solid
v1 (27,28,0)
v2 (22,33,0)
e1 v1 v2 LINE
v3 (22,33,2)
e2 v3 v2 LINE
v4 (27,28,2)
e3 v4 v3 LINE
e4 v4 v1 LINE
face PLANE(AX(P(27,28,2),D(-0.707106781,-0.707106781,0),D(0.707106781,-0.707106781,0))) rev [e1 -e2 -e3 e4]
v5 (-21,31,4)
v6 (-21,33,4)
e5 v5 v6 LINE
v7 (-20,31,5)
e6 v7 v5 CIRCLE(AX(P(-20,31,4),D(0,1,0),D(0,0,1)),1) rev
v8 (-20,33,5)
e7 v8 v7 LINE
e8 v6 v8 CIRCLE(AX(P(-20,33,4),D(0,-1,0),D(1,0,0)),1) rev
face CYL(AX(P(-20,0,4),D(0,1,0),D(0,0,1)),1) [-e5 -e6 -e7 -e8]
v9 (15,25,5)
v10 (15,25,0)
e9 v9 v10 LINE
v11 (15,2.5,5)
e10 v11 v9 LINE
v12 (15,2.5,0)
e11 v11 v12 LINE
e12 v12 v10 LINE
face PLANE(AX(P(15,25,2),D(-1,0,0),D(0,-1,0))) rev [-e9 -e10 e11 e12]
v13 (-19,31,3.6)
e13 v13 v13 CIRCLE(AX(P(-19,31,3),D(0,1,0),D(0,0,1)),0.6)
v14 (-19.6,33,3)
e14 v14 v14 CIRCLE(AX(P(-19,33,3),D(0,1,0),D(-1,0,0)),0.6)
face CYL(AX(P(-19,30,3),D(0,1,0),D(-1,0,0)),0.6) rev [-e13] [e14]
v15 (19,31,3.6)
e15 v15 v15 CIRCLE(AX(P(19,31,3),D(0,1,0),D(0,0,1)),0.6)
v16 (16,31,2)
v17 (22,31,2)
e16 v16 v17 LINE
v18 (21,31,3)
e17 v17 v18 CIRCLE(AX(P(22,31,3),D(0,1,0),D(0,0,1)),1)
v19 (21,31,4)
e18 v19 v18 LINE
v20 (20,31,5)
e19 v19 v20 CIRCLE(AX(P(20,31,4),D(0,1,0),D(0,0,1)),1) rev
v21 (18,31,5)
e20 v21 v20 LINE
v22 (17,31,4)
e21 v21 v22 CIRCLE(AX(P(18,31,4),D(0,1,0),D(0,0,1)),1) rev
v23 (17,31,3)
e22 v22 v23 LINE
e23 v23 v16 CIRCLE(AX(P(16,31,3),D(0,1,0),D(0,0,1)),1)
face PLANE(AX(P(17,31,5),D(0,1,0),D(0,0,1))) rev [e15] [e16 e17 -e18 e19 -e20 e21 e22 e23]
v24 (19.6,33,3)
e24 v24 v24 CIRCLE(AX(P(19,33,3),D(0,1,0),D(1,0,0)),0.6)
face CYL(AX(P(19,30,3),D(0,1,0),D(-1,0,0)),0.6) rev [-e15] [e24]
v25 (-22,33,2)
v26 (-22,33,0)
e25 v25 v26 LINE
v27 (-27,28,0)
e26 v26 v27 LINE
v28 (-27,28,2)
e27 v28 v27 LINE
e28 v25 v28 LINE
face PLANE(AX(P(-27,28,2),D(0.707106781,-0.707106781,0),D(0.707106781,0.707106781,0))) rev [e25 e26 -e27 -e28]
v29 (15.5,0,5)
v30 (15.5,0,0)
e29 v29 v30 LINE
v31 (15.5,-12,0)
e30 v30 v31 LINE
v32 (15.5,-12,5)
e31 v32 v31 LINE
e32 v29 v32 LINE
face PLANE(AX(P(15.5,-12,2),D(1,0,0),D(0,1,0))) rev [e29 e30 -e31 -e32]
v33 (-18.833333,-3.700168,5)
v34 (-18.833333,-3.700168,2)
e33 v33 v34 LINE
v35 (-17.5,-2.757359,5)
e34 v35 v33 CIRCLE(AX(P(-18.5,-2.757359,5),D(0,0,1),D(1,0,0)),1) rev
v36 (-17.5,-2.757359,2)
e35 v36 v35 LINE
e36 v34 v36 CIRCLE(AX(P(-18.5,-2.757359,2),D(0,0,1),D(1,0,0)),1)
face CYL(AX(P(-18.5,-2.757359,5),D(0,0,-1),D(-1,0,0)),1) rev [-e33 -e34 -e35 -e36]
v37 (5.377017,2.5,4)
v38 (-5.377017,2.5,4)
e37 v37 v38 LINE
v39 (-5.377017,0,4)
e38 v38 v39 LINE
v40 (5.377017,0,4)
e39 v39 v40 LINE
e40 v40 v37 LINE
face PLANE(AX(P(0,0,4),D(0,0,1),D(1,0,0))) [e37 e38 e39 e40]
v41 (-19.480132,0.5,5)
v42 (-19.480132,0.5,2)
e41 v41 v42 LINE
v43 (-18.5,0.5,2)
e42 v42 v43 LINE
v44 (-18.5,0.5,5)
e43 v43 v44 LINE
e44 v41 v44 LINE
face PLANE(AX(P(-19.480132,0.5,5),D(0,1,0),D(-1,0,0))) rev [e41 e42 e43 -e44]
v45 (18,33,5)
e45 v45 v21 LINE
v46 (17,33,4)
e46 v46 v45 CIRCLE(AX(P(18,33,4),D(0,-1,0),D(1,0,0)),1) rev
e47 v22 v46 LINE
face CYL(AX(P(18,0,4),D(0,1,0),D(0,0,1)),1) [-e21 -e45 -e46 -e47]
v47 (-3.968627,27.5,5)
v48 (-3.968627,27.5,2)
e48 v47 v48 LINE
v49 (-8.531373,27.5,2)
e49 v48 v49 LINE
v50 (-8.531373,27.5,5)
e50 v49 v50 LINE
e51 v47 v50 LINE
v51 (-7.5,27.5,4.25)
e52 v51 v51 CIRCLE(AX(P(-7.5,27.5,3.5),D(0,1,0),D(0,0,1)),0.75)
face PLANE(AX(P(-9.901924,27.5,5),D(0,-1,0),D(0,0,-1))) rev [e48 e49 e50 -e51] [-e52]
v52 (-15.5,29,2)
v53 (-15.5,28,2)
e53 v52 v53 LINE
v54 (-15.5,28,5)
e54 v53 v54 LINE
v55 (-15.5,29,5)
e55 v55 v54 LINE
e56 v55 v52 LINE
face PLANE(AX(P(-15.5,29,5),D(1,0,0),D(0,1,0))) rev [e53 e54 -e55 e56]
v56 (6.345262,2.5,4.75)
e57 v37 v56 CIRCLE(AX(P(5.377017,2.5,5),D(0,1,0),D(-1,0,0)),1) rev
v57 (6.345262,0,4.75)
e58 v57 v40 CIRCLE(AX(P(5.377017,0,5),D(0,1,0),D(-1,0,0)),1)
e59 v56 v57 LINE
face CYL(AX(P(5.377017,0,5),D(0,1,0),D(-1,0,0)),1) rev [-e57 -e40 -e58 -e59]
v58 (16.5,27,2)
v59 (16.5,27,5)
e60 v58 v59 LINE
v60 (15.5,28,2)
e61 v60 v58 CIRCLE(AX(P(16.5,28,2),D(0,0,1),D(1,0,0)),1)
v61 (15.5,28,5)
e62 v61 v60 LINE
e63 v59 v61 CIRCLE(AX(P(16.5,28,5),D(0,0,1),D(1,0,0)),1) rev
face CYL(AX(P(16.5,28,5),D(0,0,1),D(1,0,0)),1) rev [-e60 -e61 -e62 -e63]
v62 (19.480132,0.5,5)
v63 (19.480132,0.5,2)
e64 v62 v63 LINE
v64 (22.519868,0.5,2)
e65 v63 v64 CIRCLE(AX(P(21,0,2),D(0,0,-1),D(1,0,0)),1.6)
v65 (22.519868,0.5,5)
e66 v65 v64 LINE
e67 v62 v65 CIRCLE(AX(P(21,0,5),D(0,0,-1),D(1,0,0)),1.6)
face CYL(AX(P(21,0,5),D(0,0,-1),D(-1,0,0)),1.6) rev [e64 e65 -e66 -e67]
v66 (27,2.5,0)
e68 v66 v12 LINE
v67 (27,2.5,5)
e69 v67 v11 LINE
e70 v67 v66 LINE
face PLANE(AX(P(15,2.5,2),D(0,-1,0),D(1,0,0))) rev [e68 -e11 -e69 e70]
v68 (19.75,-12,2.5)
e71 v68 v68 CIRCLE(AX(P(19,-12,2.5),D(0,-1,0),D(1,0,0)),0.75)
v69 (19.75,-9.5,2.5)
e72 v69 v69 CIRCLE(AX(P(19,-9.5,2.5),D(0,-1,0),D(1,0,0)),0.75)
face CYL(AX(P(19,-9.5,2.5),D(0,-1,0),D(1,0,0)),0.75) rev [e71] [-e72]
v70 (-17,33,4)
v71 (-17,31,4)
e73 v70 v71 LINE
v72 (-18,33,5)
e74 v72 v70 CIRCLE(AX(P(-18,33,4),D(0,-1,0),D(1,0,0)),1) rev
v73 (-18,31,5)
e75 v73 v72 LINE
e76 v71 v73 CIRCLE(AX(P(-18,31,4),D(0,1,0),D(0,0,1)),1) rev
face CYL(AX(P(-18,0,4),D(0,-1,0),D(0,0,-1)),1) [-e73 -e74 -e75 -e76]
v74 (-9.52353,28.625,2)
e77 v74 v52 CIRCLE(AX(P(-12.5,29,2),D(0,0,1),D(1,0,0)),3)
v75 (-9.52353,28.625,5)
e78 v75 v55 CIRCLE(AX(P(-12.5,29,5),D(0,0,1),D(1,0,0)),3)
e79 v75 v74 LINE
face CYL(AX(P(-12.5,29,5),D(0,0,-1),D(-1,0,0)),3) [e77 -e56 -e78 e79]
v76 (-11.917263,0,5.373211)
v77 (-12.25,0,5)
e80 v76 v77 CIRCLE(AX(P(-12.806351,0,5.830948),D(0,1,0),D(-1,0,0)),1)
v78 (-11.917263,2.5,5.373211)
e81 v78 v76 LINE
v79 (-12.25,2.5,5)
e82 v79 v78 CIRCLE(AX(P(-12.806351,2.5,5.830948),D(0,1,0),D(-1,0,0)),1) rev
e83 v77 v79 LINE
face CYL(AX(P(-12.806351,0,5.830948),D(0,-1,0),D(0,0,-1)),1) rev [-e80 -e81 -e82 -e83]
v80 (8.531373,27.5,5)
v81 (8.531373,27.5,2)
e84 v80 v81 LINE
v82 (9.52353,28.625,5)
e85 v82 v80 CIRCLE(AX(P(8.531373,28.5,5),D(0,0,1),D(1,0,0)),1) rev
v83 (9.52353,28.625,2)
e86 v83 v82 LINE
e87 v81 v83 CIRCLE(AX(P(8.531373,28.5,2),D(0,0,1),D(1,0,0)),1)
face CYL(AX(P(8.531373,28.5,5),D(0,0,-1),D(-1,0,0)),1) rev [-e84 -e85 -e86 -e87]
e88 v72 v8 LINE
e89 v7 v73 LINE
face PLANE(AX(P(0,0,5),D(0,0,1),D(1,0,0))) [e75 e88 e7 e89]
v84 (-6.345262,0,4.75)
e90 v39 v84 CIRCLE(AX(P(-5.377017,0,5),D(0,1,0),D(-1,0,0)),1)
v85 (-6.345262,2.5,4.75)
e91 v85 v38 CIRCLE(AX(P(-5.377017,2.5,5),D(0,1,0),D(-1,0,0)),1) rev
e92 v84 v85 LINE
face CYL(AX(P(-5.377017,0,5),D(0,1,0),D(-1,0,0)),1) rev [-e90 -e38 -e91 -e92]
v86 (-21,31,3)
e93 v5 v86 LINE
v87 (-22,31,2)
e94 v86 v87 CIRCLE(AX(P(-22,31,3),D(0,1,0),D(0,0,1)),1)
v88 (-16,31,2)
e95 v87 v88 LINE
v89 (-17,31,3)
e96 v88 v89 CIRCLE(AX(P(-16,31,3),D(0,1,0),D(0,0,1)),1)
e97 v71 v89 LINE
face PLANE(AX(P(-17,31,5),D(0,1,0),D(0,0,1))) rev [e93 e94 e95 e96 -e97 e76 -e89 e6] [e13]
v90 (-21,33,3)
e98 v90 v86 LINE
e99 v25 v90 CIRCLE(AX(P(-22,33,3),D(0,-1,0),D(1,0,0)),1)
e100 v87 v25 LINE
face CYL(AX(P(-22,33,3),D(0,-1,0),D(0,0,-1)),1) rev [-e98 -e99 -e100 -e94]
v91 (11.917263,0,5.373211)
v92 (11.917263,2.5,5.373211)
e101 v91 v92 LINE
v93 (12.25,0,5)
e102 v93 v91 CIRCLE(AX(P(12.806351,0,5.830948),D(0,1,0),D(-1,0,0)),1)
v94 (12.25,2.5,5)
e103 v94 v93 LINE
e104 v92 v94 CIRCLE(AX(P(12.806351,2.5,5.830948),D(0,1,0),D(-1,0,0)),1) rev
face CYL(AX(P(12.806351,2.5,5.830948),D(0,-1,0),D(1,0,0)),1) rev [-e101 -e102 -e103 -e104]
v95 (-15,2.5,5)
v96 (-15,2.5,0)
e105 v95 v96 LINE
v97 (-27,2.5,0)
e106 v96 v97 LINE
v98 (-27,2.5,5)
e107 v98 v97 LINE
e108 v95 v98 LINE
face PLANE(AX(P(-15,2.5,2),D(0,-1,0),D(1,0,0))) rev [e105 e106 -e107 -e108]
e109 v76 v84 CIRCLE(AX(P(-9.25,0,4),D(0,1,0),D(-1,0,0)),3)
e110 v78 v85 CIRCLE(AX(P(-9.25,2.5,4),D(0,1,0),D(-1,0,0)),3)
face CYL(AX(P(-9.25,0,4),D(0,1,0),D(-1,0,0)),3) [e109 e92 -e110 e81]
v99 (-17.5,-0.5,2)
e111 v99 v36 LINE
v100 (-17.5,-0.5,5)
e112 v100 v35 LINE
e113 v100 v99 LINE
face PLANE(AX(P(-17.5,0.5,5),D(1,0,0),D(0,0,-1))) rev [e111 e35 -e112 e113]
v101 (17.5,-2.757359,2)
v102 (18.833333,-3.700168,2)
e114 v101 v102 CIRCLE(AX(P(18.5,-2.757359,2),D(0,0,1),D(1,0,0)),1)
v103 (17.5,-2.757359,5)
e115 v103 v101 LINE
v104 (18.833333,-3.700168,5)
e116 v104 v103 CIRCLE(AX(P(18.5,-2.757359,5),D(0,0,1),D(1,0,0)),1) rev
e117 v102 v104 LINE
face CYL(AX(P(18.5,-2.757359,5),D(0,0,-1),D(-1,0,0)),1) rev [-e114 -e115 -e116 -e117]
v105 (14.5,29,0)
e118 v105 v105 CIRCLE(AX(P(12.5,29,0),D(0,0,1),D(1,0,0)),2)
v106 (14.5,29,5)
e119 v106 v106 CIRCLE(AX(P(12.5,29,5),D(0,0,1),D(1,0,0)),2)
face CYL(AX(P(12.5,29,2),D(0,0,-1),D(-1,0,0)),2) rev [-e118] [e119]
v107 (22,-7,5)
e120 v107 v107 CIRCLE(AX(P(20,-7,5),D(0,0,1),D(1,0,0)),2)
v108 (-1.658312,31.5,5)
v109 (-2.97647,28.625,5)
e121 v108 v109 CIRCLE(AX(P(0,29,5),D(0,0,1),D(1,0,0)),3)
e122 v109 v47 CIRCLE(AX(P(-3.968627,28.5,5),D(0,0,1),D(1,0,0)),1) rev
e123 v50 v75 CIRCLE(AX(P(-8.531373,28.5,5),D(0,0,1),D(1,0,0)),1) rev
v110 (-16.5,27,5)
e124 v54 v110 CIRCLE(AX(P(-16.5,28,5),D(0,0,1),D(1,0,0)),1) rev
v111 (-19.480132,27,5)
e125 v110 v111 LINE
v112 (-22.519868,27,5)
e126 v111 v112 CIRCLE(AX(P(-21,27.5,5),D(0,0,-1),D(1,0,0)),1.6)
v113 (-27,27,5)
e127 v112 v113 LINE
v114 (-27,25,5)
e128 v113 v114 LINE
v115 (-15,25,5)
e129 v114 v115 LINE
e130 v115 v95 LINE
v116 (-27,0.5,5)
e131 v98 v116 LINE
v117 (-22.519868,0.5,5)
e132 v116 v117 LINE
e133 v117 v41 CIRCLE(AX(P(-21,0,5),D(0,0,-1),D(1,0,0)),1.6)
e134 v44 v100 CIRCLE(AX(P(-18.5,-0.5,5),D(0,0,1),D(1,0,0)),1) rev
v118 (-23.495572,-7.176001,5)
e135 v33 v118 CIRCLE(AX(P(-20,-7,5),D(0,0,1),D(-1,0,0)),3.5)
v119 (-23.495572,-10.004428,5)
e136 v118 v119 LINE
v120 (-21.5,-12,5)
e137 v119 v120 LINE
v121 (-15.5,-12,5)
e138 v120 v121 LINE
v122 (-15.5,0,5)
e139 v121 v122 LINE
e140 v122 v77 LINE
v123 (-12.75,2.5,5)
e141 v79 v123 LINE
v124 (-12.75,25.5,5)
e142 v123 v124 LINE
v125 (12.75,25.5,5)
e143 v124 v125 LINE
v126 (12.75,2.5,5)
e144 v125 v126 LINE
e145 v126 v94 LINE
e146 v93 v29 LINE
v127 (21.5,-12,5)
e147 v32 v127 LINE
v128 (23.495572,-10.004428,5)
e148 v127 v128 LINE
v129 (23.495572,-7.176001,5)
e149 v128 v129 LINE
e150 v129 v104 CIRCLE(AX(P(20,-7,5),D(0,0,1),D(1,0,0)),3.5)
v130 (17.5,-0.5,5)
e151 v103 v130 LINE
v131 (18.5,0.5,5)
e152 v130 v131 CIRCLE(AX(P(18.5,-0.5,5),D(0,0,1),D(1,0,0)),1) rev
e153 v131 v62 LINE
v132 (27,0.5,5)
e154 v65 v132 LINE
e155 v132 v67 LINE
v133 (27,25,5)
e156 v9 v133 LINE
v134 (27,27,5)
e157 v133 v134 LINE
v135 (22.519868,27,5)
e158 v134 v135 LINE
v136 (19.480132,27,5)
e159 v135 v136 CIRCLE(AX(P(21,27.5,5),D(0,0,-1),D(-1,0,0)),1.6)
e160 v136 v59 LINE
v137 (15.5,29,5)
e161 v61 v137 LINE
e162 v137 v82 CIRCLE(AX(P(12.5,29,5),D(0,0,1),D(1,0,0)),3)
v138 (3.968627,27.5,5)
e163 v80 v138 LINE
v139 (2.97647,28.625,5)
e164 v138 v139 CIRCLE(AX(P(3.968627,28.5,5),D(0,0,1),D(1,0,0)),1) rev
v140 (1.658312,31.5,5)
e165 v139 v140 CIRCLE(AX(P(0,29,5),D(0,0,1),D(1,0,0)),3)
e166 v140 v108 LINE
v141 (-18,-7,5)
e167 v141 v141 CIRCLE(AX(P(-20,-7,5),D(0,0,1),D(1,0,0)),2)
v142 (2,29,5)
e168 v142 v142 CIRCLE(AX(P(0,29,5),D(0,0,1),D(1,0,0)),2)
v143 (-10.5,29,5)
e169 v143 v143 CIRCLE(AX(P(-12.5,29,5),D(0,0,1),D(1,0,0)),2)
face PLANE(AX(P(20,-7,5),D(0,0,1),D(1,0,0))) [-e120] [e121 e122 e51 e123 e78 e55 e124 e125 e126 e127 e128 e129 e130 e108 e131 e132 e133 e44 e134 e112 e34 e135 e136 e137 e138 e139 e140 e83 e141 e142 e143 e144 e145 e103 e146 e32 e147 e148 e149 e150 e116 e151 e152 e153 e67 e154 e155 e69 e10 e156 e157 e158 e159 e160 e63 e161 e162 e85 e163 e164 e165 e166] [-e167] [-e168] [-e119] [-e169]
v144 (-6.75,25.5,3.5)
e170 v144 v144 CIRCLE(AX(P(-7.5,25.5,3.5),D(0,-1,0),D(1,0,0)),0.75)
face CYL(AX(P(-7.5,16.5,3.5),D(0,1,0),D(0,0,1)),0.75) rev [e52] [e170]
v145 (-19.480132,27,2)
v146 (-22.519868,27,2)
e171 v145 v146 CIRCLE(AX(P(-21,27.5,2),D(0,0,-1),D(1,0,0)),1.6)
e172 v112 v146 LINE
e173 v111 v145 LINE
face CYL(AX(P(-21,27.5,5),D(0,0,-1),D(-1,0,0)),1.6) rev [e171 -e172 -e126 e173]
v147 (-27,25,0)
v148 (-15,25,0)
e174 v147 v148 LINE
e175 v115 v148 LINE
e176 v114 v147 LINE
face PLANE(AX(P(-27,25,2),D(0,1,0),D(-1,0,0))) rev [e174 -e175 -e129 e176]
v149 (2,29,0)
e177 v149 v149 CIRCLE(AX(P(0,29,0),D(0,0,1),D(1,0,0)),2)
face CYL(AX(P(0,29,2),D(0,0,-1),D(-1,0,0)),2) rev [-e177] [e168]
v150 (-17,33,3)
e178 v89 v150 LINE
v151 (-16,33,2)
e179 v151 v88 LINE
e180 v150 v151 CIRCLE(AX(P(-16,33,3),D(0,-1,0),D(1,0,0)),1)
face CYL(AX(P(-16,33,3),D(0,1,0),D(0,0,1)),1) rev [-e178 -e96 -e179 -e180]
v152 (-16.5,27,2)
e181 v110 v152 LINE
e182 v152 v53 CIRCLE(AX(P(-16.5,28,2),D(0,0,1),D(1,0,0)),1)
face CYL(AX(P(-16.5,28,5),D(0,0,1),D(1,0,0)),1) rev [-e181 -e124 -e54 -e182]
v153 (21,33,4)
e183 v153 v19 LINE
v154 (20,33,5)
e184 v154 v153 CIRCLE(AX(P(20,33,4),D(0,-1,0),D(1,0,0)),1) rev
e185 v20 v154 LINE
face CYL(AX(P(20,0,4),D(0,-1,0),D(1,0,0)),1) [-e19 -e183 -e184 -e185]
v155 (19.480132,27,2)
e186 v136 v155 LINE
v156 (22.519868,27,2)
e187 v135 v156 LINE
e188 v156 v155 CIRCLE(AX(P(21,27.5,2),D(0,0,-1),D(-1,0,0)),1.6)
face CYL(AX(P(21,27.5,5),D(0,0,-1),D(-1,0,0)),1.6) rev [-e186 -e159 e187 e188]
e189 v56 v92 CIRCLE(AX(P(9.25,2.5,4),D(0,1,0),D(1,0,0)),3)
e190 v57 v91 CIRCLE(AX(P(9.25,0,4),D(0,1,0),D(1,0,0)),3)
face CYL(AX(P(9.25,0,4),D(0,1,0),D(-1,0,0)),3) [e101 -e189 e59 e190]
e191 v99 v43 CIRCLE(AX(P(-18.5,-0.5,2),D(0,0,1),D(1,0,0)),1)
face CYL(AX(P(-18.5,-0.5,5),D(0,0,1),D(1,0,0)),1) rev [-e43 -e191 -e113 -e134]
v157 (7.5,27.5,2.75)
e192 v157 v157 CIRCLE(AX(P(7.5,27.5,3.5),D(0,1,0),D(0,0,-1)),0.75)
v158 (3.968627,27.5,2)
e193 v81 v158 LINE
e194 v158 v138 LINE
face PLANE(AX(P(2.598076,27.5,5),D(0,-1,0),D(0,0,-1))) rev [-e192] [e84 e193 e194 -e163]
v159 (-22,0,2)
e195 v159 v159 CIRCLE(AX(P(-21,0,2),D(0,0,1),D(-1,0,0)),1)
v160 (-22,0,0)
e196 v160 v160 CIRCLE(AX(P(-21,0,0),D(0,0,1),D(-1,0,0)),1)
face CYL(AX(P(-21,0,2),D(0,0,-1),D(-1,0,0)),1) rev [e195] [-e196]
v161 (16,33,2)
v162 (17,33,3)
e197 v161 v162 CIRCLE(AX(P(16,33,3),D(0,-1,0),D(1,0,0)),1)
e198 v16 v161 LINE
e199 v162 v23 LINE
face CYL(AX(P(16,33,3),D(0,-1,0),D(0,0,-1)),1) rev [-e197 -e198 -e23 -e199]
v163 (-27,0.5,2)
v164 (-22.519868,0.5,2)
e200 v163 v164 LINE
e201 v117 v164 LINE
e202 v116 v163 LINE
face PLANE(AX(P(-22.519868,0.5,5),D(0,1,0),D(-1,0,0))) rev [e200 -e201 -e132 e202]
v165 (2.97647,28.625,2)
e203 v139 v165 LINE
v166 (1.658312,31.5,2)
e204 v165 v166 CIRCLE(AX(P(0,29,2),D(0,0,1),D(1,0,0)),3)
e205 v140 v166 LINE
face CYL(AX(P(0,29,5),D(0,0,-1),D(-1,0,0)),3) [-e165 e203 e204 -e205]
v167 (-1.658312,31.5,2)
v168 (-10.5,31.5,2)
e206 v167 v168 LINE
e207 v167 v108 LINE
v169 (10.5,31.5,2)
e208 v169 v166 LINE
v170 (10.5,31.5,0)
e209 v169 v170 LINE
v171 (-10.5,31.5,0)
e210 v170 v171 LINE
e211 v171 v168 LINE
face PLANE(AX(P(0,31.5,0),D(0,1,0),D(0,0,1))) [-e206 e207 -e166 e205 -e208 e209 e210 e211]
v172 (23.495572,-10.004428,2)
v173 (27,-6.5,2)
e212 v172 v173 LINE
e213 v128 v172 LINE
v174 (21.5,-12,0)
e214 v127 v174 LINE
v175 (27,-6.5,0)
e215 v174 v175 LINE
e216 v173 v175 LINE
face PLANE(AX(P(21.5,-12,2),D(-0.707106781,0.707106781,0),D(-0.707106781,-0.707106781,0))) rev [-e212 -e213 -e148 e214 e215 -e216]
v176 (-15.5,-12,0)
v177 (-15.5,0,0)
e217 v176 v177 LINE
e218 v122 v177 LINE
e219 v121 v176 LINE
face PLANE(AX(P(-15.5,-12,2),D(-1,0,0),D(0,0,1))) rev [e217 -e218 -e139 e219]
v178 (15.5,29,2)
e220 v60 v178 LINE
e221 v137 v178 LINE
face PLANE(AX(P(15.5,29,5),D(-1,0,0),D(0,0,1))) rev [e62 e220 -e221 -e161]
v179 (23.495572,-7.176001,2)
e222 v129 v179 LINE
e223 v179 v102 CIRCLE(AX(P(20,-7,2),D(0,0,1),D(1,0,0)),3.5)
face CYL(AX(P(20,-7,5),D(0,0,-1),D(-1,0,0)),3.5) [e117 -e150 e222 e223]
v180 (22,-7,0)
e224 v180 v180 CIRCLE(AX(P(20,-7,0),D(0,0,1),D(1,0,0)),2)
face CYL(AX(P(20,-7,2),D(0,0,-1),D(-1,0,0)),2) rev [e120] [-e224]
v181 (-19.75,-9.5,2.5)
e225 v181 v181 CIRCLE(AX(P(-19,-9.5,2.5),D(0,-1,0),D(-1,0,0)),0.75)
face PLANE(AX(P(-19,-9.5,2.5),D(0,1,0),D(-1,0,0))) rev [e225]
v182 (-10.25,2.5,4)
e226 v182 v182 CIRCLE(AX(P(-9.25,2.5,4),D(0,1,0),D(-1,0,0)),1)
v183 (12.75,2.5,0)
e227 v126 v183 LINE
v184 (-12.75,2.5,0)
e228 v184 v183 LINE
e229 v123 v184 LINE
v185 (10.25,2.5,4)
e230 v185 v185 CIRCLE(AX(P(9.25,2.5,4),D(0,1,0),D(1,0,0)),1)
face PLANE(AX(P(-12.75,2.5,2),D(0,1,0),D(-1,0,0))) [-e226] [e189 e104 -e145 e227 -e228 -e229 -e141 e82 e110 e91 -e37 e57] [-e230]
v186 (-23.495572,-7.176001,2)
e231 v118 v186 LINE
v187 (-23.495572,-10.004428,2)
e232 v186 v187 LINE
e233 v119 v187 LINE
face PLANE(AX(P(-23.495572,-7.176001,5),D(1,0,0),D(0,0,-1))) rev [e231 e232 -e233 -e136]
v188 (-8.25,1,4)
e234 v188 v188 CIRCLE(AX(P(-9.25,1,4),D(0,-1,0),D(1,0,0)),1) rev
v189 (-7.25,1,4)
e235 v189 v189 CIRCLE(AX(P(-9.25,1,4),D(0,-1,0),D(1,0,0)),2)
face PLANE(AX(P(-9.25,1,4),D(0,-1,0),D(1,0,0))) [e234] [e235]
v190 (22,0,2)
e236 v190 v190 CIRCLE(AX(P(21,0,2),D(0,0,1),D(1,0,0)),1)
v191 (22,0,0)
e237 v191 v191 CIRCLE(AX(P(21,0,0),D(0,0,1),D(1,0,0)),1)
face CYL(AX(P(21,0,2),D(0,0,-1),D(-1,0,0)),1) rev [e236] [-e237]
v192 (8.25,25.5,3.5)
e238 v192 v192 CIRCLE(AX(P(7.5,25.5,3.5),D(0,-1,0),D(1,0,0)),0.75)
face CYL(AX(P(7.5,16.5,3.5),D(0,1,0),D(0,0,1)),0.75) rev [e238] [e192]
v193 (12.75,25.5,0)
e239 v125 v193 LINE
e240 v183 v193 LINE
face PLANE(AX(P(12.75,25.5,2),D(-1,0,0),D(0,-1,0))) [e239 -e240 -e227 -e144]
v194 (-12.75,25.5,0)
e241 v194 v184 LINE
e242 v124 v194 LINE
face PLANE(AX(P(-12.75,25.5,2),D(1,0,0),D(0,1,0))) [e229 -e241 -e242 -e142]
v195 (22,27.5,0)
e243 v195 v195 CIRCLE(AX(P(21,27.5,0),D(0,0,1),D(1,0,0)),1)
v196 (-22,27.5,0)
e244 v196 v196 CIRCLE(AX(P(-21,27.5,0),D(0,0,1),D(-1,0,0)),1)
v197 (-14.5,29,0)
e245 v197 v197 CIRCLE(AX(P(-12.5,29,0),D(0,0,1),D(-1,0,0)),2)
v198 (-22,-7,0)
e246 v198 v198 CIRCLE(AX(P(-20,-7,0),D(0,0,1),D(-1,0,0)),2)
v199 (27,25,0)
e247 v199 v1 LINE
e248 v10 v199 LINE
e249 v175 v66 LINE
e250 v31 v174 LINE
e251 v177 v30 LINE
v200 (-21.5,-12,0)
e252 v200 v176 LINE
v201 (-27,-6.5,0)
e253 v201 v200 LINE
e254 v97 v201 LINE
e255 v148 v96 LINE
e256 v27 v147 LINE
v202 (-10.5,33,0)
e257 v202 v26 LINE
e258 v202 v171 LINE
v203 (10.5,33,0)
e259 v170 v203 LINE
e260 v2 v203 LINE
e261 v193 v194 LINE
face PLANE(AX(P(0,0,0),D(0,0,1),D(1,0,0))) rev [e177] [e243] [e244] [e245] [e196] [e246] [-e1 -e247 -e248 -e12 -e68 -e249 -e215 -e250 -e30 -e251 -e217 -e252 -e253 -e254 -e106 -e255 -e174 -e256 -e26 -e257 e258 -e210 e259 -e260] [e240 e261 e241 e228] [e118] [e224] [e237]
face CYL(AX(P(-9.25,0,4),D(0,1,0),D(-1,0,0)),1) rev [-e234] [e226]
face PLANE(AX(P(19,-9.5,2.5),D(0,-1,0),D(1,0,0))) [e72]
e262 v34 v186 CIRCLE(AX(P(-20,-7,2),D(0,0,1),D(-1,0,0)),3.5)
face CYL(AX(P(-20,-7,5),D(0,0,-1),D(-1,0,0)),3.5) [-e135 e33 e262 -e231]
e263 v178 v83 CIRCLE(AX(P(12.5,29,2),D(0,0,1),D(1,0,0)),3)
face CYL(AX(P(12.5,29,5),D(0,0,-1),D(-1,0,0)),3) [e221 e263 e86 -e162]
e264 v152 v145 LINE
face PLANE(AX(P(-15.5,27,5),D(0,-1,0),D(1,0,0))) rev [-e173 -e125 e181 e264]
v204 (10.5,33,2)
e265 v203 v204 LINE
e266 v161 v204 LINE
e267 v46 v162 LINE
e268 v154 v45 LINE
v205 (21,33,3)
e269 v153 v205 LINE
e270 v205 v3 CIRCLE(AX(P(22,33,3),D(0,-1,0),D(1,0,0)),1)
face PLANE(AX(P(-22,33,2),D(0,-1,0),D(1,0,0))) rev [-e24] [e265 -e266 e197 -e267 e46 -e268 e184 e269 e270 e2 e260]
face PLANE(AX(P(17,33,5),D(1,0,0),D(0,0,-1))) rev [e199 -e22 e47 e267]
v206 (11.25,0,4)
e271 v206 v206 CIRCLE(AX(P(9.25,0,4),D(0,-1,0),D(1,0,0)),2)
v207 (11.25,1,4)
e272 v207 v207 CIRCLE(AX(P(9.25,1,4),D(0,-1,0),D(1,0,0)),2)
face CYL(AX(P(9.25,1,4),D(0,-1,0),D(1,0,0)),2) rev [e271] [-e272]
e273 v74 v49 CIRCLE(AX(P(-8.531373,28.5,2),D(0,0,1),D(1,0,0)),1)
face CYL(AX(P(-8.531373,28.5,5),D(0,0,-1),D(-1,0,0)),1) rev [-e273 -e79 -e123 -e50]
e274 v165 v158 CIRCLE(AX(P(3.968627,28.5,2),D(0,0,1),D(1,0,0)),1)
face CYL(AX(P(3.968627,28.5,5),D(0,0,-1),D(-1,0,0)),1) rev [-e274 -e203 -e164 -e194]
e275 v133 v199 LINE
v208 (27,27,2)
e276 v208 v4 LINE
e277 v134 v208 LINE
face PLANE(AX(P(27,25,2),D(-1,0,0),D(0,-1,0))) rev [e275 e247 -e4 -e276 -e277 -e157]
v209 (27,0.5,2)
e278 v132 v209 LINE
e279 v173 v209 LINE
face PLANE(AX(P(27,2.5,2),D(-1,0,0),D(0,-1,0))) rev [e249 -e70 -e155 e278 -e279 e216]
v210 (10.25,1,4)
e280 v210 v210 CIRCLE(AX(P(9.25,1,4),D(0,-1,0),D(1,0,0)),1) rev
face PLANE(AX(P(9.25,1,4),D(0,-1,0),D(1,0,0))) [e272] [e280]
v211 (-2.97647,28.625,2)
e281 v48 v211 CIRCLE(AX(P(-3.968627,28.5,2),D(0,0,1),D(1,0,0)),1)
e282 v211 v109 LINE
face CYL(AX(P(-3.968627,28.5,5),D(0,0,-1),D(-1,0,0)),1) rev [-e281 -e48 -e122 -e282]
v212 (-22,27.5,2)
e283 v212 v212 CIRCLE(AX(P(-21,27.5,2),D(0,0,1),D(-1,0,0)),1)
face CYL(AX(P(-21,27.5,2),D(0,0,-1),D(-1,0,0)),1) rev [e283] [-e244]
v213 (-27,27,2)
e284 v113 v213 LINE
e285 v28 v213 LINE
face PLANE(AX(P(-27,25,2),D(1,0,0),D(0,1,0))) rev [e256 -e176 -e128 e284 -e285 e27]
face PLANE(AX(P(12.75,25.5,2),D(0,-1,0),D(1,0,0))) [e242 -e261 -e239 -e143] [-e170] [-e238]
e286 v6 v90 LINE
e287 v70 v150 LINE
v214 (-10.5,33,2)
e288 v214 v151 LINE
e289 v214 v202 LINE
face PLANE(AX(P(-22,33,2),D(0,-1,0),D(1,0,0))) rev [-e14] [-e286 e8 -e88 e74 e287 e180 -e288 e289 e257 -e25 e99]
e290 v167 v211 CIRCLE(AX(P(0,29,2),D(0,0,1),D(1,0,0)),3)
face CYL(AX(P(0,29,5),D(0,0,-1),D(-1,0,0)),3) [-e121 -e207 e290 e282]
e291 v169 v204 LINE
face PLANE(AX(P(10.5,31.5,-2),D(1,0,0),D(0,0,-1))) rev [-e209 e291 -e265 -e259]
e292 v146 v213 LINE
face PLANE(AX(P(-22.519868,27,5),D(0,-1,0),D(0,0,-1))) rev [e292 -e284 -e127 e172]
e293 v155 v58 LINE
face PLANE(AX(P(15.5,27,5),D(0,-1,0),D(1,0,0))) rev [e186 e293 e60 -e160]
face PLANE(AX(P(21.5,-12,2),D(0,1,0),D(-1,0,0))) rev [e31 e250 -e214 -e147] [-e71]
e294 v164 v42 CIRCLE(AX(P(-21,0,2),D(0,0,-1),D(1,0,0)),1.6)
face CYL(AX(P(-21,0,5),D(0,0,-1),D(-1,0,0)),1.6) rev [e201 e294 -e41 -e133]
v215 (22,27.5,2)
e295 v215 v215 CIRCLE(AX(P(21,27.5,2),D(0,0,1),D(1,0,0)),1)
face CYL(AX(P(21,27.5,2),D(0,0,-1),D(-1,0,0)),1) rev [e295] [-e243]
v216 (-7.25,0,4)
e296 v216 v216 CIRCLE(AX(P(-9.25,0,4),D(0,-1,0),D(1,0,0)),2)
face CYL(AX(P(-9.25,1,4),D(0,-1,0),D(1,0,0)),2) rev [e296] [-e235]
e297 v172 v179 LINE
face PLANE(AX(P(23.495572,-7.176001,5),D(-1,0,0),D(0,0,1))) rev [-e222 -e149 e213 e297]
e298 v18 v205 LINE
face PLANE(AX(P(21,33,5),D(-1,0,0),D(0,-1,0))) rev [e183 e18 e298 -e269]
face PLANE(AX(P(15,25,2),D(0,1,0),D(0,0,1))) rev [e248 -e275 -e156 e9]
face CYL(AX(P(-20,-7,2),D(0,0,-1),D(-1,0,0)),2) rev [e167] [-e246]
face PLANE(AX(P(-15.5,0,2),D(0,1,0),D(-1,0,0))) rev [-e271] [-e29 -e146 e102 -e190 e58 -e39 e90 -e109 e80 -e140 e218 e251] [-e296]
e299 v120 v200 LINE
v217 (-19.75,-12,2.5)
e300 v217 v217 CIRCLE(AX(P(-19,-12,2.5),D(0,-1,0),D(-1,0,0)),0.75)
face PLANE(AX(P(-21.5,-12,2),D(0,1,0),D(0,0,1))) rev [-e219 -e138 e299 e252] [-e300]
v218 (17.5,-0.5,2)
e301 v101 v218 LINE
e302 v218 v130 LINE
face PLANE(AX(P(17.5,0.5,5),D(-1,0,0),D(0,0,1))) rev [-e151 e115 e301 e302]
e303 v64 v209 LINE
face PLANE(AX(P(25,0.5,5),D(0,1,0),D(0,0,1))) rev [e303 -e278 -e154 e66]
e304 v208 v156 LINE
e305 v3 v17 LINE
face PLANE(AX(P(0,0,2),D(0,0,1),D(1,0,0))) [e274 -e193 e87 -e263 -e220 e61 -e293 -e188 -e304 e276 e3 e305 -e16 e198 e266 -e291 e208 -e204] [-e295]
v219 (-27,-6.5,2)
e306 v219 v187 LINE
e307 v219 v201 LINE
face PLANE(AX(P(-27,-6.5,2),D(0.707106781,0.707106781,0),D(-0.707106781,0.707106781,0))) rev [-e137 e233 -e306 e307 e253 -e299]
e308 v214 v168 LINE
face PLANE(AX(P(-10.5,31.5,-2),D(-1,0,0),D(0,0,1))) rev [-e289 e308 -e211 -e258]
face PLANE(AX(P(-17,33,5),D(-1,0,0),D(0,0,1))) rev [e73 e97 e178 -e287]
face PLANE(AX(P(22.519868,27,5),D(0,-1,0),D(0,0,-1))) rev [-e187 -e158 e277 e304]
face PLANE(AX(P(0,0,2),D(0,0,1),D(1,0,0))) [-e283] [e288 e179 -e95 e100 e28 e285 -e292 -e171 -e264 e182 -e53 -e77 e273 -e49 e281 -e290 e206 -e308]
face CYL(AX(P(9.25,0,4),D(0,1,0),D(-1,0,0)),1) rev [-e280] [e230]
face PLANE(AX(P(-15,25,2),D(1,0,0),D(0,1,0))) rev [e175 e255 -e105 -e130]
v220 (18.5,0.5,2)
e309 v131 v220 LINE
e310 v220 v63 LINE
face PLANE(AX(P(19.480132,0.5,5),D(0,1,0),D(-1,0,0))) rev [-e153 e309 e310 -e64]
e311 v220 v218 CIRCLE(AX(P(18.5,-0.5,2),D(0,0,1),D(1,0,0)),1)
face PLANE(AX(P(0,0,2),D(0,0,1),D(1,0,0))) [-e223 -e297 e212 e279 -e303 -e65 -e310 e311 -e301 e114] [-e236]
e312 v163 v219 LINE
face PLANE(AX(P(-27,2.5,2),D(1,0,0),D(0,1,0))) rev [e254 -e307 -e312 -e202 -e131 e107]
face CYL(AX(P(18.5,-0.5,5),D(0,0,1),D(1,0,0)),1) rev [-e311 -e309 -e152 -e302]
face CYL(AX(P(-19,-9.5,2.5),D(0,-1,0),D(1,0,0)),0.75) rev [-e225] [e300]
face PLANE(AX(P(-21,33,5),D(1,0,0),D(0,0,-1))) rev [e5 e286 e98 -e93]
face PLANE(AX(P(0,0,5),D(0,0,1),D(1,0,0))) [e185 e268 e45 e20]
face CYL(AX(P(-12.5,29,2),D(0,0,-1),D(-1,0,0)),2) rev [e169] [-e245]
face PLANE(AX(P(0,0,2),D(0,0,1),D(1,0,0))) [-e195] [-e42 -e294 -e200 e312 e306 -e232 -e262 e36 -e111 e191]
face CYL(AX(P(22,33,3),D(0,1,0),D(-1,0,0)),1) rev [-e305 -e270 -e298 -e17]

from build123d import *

# Parameters (mm, degrees)
SKETCH_1_R          = 2
SKETCH_1_R_2        = 1
SKETCH_1_W          = 25.5
SKETCH_1_H          = 23
EXTRUDE_1_DEPTH     = 2
SKETCH_3_R          = 1
EXTRUDE_2_DEPTH     = 2.5
SKETCH_4_R          = 2
SKETCH_4_W          = 4
SKETCH_4_H          = 2
EXTRUDE_3_DEPTH     = 3
FILLET_1_R          = 1
FILLET_2_R          = 1
SKETCH_5_W          = 12.5
SKETCH_5_H          = 2.5
EXTRUDE_4_DEPTH     = 2
FILLET_3_R          = 1
SKETCH_6_R          = 2
CUT_EXTRUDE_1_DEPTH = 1
SKETCH_7_R          = 0.75
CUT_EXTRUDE_2_DEPTH = 2.5
SKETCH_8_R          = 0.6
CUT_EXTRUDE_3_DEPTH = 3
SKETCH1_W           = 21
SKETCH1_H           = 10
CUT_EXTRUDE1_DEPTH  = 1.5
SKETCH3_R           = 0.75
CUT_EXTRUDE2_DEPTH  = 11


with BuildPart() as part:
    # 草图1 → 凸台-拉伸1 (new body)
    with BuildSketch(Plane.XY):
        Polygon((-27, 25), (-15, 25), (-15, 2.5), (-27, 2.5), (-27, -6.5), (-21.5, -12), (-15.5, -12), (-15.5, 0), (15.5, 0), (15.5, -12), (21.5, -12), (27, -6.5), (27, 2.5), (15, 2.5), (15, 25), (27, 25), (27, 28), (22, 33), (-22, 33), (-27, 28), align=None)
        with Locations((20, -7)):
            Circle(SKETCH_1_R, mode=Mode.SUBTRACT)
        with Locations((12.5, 29)):
            Circle(SKETCH_1_R, mode=Mode.SUBTRACT)
        with Locations((0, 29)):
            Circle(SKETCH_1_R, mode=Mode.SUBTRACT)
        with Locations(Location((-20, -7, 0), (0, 0, 180))):
            Circle(SKETCH_1_R, mode=Mode.SUBTRACT)
        with Locations(Location((-12.5, 29, 0), (0, 0, 180))):
            Circle(SKETCH_1_R, mode=Mode.SUBTRACT)
        with Locations((21, 27.5)):
            Circle(SKETCH_1_R_2, mode=Mode.SUBTRACT)
        with Locations((21, 0)):
            Circle(SKETCH_1_R_2, mode=Mode.SUBTRACT)
        with Locations(Location((-21, 27.5, 0), (0, 0, 180))):
            Circle(SKETCH_1_R_2, mode=Mode.SUBTRACT)
        with Locations(Location((-21, 0, 0), (0, 0, 180))):
            Circle(SKETCH_1_R_2, mode=Mode.SUBTRACT)
        with Locations((0, 14)):
            Rectangle(SKETCH_1_W, SKETCH_1_H, mode=Mode.SUBTRACT)
    extrude(amount=EXTRUDE_1_DEPTH)

    # 草图3 → 凸台-拉伸2 (add)
    # profile 1 of 2: a face of its own
    with BuildSketch(Plane(origin=(0, 2.5, 0), x_dir=(1, 0, 0), z_dir=(0, 1, 0))):
        with BuildLine():
            Line((-6.25, -2), (-6.25, -4))
            ThreePointArc((-6.25, -4), (-9.25, -7), (-12.25, -4))
            Line((-12.25, -4), (-12.25, -2))
            Line((-12.25, -2), (-6.25, -2))
        make_face()
        with Locations(Location((-9.25, -4, 0), (0, 0, 180))):
            Circle(SKETCH_3_R, mode=Mode.SUBTRACT)
    # profile 2 of 2: a face of its own
    with BuildSketch(Plane(origin=(0, 2.5, 0), x_dir=(1, 0, 0), z_dir=(0, 1, 0))):
        with BuildLine():
            Line((12.25, -2), (6.25, -2))
            Line((6.25, -2), (6.25, -4))
            ThreePointArc((6.25, -4), (9.25, -7), (12.25, -4))
            Line((12.25, -4), (12.25, -2))
        make_face()
        with Locations((9.25, -4)):
            Circle(SKETCH_3_R, mode=Mode.SUBTRACT)
    extrude(amount=-EXTRUDE_2_DEPTH)

    # 草图4 → 凸台-拉伸3 (add)
    # profile 1 of 3: a face of its own
    with BuildSketch(Plane.XY.offset(2)):
        with BuildLine():
            Line((-15.5, 29), (-15.5, 27))
            Line((-15.5, 27), (-19.480131585, 27))
            ThreePointArc((-19.480131585, 27), (-21, 25.9), (-22.519868415, 27))
            Line((-22.519868415, 27), (-27, 27))
            Line((-27, 27), (-27, 25))
            Line((-27, 25), (-16.5, 25))
            Line((-16.5, 25), (-15, 25))
            Line((-15, 25), (-15, 2.5))
            Line((-15, 2.5), (-27, 2.5))
            Line((-27, 2.5), (-27, 0.5))
            Line((-27, 0.5), (-25, 0.5))
            Line((-25, 0.5), (-22.519868415, 0.5))
            ThreePointArc((-22.519868415, 0.5), (-21, 1.6), (-19.480131585, 0.5))
            Line((-19.480131585, 0.5), (-17.5, 0.5))
            Line((-17.5, 0.5), (-17.5, -4.550510257))
            ThreePointArc((-17.5, -4.550510257), (-21.403955533, -3.793926254), (-23.495572013, -7.176000862))
            Line((-23.495572013, -7.176000862), (-23.495572013, -10.004427987))
            Line((-23.495572013, -10.004427987), (-21.5, -12))
            Line((-21.5, -12), (-15.5, -12))
            Line((-15.5, -12), (-15.5, 0))
            Line((-15.5, 0), (-12.25, 0))
            Line((-12.25, 0), (-12.25, 2.5))
            Line((-12.25, 2.5), (-12.75, 2.5))
            Line((-12.75, 2.5), (-12.75, 25.5))
            Line((-12.75, 25.5), (12.75, 25.5))
            Line((12.75, 25.5), (12.75, 2.5))
            Line((12.75, 2.5), (12.25, 2.5))
            Line((12.25, 2.5), (12.25, 0))
            Line((12.25, 0), (15.5, 0))
            Line((15.5, 0), (15.5, -12))
            Line((15.5, -12), (21.5, -12))
            Line((21.5, -12), (23.495572013, -10.004427987))
            Line((23.495572013, -10.004427987), (23.495572013, -7.176000862))
            ThreePointArc((23.495572013, -7.176000862), (21.403955533, -3.793926254), (17.5, -4.550510257))
            Line((17.5, -4.550510257), (17.5, 0.5))
            Line((17.5, 0.5), (19.480131585, 0.5))
            ThreePointArc((19.480131585, 0.5), (21, 1.6), (22.519868415, 0.5))
            Line((22.519868415, 0.5), (25, 0.5))
            Line((25, 0.5), (27, 0.5))
            Line((27, 0.5), (27, 2.5))
            Line((27, 2.5), (15, 2.5))
            Line((15, 2.5), (15, 25))
            Line((15, 25), (16.5, 25))
            Line((16.5, 25), (27, 25))
            Line((27, 25), (27, 27))
            Line((27, 27), (22.519868415, 27))
            ThreePointArc((22.519868415, 27), (21, 25.9), (19.480131585, 27))
            Line((19.480131585, 27), (15.5, 27))
            Line((15.5, 27), (15.5, 29))
            ThreePointArc((15.5, 29), (11.723542865, 31.897777479), (9.901923789, 27.5))
            Line((9.901923789, 27.5), (2.598076211, 27.5))
            ThreePointArc((2.598076211, 27.5), (0, 32), (-2.598076211, 27.5))
            Line((-2.598076211, 27.5), (-9.901923789, 27.5))
            ThreePointArc((-9.901923789, 27.5), (-11.723542865, 31.897777479), (-15.5, 29))
        make_face()
        with Locations((20, -7)):
            Circle(SKETCH_4_R, mode=Mode.SUBTRACT)
        with Locations((12.5, 29)):
            Circle(SKETCH_4_R, mode=Mode.SUBTRACT)
        with Locations((0, 29)):
            Circle(SKETCH_4_R, mode=Mode.SUBTRACT)
        with Locations(Location((-12.5, 29, 0), (0, 0, 180))):
            Circle(SKETCH_4_R, mode=Mode.SUBTRACT)
        with Locations(Location((-20, -7, 0), (0, 0, 180))):
            Circle(SKETCH_4_R, mode=Mode.SUBTRACT)
    # profile 2 of 3: a face of its own
    with BuildSketch(Plane.XY.offset(2)):
        with Locations((-19, 32)):
            Rectangle(SKETCH_4_W, SKETCH_4_H)
    # profile 3 of 3: a face of its own
    with BuildSketch(Plane.XY.offset(2)):
        with Locations((19, 32)):
            Rectangle(SKETCH_4_W, SKETCH_4_H)
    extrude(amount=EXTRUDE_3_DEPTH)

    # 圆角1
    # the kernel refuses this fillet: 1 mm, written as the material it adds along each edge
    with BuildSketch(Plane(origin=(17.5, -4.550510257, 2), x_dir=(0, 1, 0), z_dir=(0, 0, 1))) as fillet_1_piece_1:
        with BuildLine():
            CenterArc((1.793150944, -1), FILLET_1_R, 90, 109.471220634)
            ThreePointArc((0.850341903, -1.333333333), (0.5014624, -0.618011305), (0, 0))
            Line((0, 0), (1.793150944, 0))
        make_face()
    extrude(amount=3)
    with BuildSketch(Plane(origin=(17.5, 0.5, 2), x_dir=(1, 0, 0), z_dir=(0, 0, 1)), Plane(origin=(15.5, 27, 2), x_dir=(0, 1, 0), z_dir=(0, 0, 1)), Plane(origin=(-15.5, 27, 2), x_dir=(-1, 0, 0), z_dir=(0, 0, 1)), Plane(origin=(-17.5, 0.5, 2), x_dir=(0, -1, 0), z_dir=(0, 0, 1))) as fillet_1_piece_2:
        with BuildLine():
            CenterArc((FILLET_1_R, -FILLET_1_R), FILLET_1_R, 90, 90)
            Line((0, -FILLET_1_R), (0, 0))
            Line((0, 0), (FILLET_1_R, 0))
        make_face()
    extrude(amount=3)
    with BuildSketch(Plane(origin=(9.901923789, 27.5, 2), x_dir=(-1, 0, 0), z_dir=(0, 0, 1)), Plane(origin=(-2.598076211, 27.5, 2), x_dir=(-1, 0, 0), z_dir=(0, 0, 1))) as fillet_1_piece_3:
        with BuildLine():
            CenterArc((1.370550755, -1), FILLET_1_R, 90, 97.180755781)
            ThreePointArc((0.378394014, -1.125), (0.245389674, -0.543599583), (0, 0))
            Line((0, 0), (1.370550755, 0))
        make_face()
    extrude(amount=3)
    with BuildSketch(Plane(origin=(2.598076211, 27.5, 2), x_dir=(0.31880013895525616, 0.9478219618694798, 0), z_dir=(0, 0, 1)), Plane(origin=(-9.901923789, 27.5, 2), x_dir=(0.3188001389552541, 0.9478219618694803, 0), z_dir=(0, 0, 1))) as fillet_1_piece_4:
        with BuildLine():
            CenterArc((1.384753733, -0.980237967), FILLET_1_R, 101.409622109, 97.180755781)
            Line((0.436931771, -1.299038106), (0, 0))
            ThreePointArc((0, 0), (0.593465886, -0.0592861), (1.186931771, 0))
        make_face()
    extrude(amount=3)
    with BuildSketch(Plane(origin=(-17.5, -4.550510257, 2), x_dir=(-0.8431291837491304, 0.5377110557823086, 0), z_dir=(0, 0, 1))) as fillet_1_piece_5:
        with BuildLine():
            CenterArc((1.807326271, -0.974146836), FILLET_1_R, 103.056735384, 109.471220635)
            Line((0.964197087, -1.511857892), (0, 0))
            ThreePointArc((0, 0), (0.790705244, -0.090486073), (1.581410487, 0))
        make_face()
    extrude(amount=3)
    with BuildSketch(Plane(origin=(-21, 33, 2), x_dir=(-1, 0, 0), z_dir=(0, -1, 0)), Plane(origin=(-17, 31, 2), x_dir=(1, 0, 0), z_dir=(0, 1, 0))) as fillet_1_piece_6:
        with BuildLine():
            CenterArc((FILLET_1_R, -FILLET_1_R), FILLET_1_R, 90, 90)
            Line((0, -FILLET_1_R), (0, 0))
            Line((0, 0), (FILLET_1_R, 0))
        make_face()
    extrude(amount=2)
    with BuildSketch(Plane(origin=(17, 31, 2), x_dir=(-1, 0, 0), z_dir=(0, 1, 0)), Plane(origin=(21, 33, 2), x_dir=(1, 0, 0), z_dir=(0, -1, 0))) as fillet_1_piece_7:
        with BuildLine():
            CenterArc((FILLET_1_R, FILLET_1_R), FILLET_1_R, 180, 90)
            Line((0, FILLET_1_R), (0, 0))
            Line((0, 0), (FILLET_1_R, 0))
        make_face()
    extrude(amount=2)
    # the kernel refuses this fillet: 1 mm, written as the material it takes off along each edge
    with BuildSketch(Plane(origin=(-21, 35.5, 5), x_dir=(0, 0, -1), z_dir=(0, -1, 0)), Plane(origin=(21, 35.5, 5), x_dir=(-1, 0, 0), z_dir=(0, -1, 0))) as fillet_1_2_piece_1:
        with BuildLine():
            CenterArc((FILLET_1_R, FILLET_1_R), FILLET_1_R, 180, 90)
            Line((0, FILLET_1_R), (0, 0))
            Line((0, 0), (FILLET_1_R, 0))
        make_face()
    extrude(amount=7, mode=Mode.SUBTRACT)
    with BuildSketch(Plane(origin=(-17, 28.5, 5), x_dir=(-1, 0, 0), z_dir=(0, 1, 0)), Plane(origin=(17, 28.5, 5), x_dir=(0, 0, -1), z_dir=(0, 1, 0))) as fillet_1_2_piece_2:
        with BuildLine():
            CenterArc((FILLET_1_R, -FILLET_1_R), FILLET_1_R, 90, 90)
            Line((0, -FILLET_1_R), (0, 0))
            Line((0, 0), (FILLET_1_R, 0))
        make_face()
    extrude(amount=7, mode=Mode.SUBTRACT)

    # 圆角2
    # the kernel refuses this fillet: 1 mm, written as the material it adds along each edge
    with BuildSketch(Plane(origin=(-12.25, 2.5, 4), x_dir=(0, 0, 1), z_dir=(0, -1, 0))) as fillet_2_piece_1:
        with BuildLine():
            CenterArc((1.830947502, 0.556350833), FILLET_2_R, 213.80380727, 28.955024372)
            ThreePointArc((1.373210626, -0.332736875), (0.706473859, -0.084370619), (0, 0))
            Line((0, 0), (1, 0))
        make_face()
    extrude(amount=2.5)
    with BuildSketch(Plane(origin=(12.25, 2.5, 4), x_dir=(0, 0, 1), z_dir=(0, -1, 0))) as fillet_2_piece_2:
        with BuildLine():
            CenterArc((1.830947502, -0.556350833), FILLET_2_R, 117.241168358, 28.955024372)
            ThreePointArc((1.373210626, 0.332736875), (0.706473859, 0.084370619), (0, 0))
            Line((0, 0), (1, 0))
        make_face()
    extrude(amount=2.5)

    # 草图5 → 凸台-拉伸4 (add)
    with BuildSketch(Plane.XY.offset(2)):
        with Locations((0, 1.25)):
            Rectangle(SKETCH_5_W, SKETCH_5_H)
    extrude(amount=EXTRUDE_4_DEPTH)

    # 圆角3
    fillet_3_edges = [part.edges().sort_by_distance(p)[0] for p in [
        (-6.25, 1.25, 4),
        (6.25, 1.25, 4),
    ]]
    fillet(fillet_3_edges, radius=FILLET_3_R)

    # 草图6 → 切除-拉伸1 (cut)
    with BuildSketch(Plane.XZ):
        with Locations((-9.25, 4)):
            Circle(SKETCH_6_R)
        with Locations((9.25, 4)):
            Circle(SKETCH_6_R)
    extrude(amount=-CUT_EXTRUDE_1_DEPTH, mode=Mode.SUBTRACT)

    # 草图7 → 切除-拉伸2 (cut)
    with BuildSketch(Plane.XZ.offset(12)):
        with Locations((19, 2.5)):
            Circle(SKETCH_7_R)
        with Locations(Location((-19, 2.5, 0), (0, 0, 180))):
            Circle(SKETCH_7_R)
    extrude(amount=-CUT_EXTRUDE_2_DEPTH, mode=Mode.SUBTRACT)

    # 草图8 → 切除-拉伸3 (cut)
    with BuildSketch(Plane(origin=(0, 33, 0), x_dir=(1, 0, 0), z_dir=(0, 1, 0))):
        with Locations(Location((-19, -3, 0), (0, 0, 180))):
            Circle(SKETCH_8_R)
        with Locations(Location((19, -3, 0), (0, 0, 270))):
            Circle(SKETCH_8_R)
    extrude(amount=-CUT_EXTRUDE_3_DEPTH, mode=Mode.SUBTRACT)

    # Sketch1 → Cut-Extrude1 (cut)
    with BuildSketch(Plane(origin=(0, 33, 0), x_dir=(1, 0, 0), z_dir=(0, 1, 0))):
        with Locations((0, -3)):
            Rectangle(SKETCH1_W, SKETCH1_H)
    extrude(amount=-CUT_EXTRUDE1_DEPTH, mode=Mode.SUBTRACT)

    # Sketch3 → Cut-Extrude2 (cut)
    with BuildSketch(Plane(origin=(0, 27.5, 0), x_dir=(1, 0, 0), z_dir=(0, 1, 0))):
        with Locations(Location((-7.5, -3.5, 0), (0, 0, 270))):
            Circle(SKETCH3_R)
        with Locations((7.5, -3.5)):
            Circle(SKETCH3_R)
    extrude(amount=-CUT_EXTRUDE2_DEPTH, mode=Mode.SUBTRACT)


solid = part.part
